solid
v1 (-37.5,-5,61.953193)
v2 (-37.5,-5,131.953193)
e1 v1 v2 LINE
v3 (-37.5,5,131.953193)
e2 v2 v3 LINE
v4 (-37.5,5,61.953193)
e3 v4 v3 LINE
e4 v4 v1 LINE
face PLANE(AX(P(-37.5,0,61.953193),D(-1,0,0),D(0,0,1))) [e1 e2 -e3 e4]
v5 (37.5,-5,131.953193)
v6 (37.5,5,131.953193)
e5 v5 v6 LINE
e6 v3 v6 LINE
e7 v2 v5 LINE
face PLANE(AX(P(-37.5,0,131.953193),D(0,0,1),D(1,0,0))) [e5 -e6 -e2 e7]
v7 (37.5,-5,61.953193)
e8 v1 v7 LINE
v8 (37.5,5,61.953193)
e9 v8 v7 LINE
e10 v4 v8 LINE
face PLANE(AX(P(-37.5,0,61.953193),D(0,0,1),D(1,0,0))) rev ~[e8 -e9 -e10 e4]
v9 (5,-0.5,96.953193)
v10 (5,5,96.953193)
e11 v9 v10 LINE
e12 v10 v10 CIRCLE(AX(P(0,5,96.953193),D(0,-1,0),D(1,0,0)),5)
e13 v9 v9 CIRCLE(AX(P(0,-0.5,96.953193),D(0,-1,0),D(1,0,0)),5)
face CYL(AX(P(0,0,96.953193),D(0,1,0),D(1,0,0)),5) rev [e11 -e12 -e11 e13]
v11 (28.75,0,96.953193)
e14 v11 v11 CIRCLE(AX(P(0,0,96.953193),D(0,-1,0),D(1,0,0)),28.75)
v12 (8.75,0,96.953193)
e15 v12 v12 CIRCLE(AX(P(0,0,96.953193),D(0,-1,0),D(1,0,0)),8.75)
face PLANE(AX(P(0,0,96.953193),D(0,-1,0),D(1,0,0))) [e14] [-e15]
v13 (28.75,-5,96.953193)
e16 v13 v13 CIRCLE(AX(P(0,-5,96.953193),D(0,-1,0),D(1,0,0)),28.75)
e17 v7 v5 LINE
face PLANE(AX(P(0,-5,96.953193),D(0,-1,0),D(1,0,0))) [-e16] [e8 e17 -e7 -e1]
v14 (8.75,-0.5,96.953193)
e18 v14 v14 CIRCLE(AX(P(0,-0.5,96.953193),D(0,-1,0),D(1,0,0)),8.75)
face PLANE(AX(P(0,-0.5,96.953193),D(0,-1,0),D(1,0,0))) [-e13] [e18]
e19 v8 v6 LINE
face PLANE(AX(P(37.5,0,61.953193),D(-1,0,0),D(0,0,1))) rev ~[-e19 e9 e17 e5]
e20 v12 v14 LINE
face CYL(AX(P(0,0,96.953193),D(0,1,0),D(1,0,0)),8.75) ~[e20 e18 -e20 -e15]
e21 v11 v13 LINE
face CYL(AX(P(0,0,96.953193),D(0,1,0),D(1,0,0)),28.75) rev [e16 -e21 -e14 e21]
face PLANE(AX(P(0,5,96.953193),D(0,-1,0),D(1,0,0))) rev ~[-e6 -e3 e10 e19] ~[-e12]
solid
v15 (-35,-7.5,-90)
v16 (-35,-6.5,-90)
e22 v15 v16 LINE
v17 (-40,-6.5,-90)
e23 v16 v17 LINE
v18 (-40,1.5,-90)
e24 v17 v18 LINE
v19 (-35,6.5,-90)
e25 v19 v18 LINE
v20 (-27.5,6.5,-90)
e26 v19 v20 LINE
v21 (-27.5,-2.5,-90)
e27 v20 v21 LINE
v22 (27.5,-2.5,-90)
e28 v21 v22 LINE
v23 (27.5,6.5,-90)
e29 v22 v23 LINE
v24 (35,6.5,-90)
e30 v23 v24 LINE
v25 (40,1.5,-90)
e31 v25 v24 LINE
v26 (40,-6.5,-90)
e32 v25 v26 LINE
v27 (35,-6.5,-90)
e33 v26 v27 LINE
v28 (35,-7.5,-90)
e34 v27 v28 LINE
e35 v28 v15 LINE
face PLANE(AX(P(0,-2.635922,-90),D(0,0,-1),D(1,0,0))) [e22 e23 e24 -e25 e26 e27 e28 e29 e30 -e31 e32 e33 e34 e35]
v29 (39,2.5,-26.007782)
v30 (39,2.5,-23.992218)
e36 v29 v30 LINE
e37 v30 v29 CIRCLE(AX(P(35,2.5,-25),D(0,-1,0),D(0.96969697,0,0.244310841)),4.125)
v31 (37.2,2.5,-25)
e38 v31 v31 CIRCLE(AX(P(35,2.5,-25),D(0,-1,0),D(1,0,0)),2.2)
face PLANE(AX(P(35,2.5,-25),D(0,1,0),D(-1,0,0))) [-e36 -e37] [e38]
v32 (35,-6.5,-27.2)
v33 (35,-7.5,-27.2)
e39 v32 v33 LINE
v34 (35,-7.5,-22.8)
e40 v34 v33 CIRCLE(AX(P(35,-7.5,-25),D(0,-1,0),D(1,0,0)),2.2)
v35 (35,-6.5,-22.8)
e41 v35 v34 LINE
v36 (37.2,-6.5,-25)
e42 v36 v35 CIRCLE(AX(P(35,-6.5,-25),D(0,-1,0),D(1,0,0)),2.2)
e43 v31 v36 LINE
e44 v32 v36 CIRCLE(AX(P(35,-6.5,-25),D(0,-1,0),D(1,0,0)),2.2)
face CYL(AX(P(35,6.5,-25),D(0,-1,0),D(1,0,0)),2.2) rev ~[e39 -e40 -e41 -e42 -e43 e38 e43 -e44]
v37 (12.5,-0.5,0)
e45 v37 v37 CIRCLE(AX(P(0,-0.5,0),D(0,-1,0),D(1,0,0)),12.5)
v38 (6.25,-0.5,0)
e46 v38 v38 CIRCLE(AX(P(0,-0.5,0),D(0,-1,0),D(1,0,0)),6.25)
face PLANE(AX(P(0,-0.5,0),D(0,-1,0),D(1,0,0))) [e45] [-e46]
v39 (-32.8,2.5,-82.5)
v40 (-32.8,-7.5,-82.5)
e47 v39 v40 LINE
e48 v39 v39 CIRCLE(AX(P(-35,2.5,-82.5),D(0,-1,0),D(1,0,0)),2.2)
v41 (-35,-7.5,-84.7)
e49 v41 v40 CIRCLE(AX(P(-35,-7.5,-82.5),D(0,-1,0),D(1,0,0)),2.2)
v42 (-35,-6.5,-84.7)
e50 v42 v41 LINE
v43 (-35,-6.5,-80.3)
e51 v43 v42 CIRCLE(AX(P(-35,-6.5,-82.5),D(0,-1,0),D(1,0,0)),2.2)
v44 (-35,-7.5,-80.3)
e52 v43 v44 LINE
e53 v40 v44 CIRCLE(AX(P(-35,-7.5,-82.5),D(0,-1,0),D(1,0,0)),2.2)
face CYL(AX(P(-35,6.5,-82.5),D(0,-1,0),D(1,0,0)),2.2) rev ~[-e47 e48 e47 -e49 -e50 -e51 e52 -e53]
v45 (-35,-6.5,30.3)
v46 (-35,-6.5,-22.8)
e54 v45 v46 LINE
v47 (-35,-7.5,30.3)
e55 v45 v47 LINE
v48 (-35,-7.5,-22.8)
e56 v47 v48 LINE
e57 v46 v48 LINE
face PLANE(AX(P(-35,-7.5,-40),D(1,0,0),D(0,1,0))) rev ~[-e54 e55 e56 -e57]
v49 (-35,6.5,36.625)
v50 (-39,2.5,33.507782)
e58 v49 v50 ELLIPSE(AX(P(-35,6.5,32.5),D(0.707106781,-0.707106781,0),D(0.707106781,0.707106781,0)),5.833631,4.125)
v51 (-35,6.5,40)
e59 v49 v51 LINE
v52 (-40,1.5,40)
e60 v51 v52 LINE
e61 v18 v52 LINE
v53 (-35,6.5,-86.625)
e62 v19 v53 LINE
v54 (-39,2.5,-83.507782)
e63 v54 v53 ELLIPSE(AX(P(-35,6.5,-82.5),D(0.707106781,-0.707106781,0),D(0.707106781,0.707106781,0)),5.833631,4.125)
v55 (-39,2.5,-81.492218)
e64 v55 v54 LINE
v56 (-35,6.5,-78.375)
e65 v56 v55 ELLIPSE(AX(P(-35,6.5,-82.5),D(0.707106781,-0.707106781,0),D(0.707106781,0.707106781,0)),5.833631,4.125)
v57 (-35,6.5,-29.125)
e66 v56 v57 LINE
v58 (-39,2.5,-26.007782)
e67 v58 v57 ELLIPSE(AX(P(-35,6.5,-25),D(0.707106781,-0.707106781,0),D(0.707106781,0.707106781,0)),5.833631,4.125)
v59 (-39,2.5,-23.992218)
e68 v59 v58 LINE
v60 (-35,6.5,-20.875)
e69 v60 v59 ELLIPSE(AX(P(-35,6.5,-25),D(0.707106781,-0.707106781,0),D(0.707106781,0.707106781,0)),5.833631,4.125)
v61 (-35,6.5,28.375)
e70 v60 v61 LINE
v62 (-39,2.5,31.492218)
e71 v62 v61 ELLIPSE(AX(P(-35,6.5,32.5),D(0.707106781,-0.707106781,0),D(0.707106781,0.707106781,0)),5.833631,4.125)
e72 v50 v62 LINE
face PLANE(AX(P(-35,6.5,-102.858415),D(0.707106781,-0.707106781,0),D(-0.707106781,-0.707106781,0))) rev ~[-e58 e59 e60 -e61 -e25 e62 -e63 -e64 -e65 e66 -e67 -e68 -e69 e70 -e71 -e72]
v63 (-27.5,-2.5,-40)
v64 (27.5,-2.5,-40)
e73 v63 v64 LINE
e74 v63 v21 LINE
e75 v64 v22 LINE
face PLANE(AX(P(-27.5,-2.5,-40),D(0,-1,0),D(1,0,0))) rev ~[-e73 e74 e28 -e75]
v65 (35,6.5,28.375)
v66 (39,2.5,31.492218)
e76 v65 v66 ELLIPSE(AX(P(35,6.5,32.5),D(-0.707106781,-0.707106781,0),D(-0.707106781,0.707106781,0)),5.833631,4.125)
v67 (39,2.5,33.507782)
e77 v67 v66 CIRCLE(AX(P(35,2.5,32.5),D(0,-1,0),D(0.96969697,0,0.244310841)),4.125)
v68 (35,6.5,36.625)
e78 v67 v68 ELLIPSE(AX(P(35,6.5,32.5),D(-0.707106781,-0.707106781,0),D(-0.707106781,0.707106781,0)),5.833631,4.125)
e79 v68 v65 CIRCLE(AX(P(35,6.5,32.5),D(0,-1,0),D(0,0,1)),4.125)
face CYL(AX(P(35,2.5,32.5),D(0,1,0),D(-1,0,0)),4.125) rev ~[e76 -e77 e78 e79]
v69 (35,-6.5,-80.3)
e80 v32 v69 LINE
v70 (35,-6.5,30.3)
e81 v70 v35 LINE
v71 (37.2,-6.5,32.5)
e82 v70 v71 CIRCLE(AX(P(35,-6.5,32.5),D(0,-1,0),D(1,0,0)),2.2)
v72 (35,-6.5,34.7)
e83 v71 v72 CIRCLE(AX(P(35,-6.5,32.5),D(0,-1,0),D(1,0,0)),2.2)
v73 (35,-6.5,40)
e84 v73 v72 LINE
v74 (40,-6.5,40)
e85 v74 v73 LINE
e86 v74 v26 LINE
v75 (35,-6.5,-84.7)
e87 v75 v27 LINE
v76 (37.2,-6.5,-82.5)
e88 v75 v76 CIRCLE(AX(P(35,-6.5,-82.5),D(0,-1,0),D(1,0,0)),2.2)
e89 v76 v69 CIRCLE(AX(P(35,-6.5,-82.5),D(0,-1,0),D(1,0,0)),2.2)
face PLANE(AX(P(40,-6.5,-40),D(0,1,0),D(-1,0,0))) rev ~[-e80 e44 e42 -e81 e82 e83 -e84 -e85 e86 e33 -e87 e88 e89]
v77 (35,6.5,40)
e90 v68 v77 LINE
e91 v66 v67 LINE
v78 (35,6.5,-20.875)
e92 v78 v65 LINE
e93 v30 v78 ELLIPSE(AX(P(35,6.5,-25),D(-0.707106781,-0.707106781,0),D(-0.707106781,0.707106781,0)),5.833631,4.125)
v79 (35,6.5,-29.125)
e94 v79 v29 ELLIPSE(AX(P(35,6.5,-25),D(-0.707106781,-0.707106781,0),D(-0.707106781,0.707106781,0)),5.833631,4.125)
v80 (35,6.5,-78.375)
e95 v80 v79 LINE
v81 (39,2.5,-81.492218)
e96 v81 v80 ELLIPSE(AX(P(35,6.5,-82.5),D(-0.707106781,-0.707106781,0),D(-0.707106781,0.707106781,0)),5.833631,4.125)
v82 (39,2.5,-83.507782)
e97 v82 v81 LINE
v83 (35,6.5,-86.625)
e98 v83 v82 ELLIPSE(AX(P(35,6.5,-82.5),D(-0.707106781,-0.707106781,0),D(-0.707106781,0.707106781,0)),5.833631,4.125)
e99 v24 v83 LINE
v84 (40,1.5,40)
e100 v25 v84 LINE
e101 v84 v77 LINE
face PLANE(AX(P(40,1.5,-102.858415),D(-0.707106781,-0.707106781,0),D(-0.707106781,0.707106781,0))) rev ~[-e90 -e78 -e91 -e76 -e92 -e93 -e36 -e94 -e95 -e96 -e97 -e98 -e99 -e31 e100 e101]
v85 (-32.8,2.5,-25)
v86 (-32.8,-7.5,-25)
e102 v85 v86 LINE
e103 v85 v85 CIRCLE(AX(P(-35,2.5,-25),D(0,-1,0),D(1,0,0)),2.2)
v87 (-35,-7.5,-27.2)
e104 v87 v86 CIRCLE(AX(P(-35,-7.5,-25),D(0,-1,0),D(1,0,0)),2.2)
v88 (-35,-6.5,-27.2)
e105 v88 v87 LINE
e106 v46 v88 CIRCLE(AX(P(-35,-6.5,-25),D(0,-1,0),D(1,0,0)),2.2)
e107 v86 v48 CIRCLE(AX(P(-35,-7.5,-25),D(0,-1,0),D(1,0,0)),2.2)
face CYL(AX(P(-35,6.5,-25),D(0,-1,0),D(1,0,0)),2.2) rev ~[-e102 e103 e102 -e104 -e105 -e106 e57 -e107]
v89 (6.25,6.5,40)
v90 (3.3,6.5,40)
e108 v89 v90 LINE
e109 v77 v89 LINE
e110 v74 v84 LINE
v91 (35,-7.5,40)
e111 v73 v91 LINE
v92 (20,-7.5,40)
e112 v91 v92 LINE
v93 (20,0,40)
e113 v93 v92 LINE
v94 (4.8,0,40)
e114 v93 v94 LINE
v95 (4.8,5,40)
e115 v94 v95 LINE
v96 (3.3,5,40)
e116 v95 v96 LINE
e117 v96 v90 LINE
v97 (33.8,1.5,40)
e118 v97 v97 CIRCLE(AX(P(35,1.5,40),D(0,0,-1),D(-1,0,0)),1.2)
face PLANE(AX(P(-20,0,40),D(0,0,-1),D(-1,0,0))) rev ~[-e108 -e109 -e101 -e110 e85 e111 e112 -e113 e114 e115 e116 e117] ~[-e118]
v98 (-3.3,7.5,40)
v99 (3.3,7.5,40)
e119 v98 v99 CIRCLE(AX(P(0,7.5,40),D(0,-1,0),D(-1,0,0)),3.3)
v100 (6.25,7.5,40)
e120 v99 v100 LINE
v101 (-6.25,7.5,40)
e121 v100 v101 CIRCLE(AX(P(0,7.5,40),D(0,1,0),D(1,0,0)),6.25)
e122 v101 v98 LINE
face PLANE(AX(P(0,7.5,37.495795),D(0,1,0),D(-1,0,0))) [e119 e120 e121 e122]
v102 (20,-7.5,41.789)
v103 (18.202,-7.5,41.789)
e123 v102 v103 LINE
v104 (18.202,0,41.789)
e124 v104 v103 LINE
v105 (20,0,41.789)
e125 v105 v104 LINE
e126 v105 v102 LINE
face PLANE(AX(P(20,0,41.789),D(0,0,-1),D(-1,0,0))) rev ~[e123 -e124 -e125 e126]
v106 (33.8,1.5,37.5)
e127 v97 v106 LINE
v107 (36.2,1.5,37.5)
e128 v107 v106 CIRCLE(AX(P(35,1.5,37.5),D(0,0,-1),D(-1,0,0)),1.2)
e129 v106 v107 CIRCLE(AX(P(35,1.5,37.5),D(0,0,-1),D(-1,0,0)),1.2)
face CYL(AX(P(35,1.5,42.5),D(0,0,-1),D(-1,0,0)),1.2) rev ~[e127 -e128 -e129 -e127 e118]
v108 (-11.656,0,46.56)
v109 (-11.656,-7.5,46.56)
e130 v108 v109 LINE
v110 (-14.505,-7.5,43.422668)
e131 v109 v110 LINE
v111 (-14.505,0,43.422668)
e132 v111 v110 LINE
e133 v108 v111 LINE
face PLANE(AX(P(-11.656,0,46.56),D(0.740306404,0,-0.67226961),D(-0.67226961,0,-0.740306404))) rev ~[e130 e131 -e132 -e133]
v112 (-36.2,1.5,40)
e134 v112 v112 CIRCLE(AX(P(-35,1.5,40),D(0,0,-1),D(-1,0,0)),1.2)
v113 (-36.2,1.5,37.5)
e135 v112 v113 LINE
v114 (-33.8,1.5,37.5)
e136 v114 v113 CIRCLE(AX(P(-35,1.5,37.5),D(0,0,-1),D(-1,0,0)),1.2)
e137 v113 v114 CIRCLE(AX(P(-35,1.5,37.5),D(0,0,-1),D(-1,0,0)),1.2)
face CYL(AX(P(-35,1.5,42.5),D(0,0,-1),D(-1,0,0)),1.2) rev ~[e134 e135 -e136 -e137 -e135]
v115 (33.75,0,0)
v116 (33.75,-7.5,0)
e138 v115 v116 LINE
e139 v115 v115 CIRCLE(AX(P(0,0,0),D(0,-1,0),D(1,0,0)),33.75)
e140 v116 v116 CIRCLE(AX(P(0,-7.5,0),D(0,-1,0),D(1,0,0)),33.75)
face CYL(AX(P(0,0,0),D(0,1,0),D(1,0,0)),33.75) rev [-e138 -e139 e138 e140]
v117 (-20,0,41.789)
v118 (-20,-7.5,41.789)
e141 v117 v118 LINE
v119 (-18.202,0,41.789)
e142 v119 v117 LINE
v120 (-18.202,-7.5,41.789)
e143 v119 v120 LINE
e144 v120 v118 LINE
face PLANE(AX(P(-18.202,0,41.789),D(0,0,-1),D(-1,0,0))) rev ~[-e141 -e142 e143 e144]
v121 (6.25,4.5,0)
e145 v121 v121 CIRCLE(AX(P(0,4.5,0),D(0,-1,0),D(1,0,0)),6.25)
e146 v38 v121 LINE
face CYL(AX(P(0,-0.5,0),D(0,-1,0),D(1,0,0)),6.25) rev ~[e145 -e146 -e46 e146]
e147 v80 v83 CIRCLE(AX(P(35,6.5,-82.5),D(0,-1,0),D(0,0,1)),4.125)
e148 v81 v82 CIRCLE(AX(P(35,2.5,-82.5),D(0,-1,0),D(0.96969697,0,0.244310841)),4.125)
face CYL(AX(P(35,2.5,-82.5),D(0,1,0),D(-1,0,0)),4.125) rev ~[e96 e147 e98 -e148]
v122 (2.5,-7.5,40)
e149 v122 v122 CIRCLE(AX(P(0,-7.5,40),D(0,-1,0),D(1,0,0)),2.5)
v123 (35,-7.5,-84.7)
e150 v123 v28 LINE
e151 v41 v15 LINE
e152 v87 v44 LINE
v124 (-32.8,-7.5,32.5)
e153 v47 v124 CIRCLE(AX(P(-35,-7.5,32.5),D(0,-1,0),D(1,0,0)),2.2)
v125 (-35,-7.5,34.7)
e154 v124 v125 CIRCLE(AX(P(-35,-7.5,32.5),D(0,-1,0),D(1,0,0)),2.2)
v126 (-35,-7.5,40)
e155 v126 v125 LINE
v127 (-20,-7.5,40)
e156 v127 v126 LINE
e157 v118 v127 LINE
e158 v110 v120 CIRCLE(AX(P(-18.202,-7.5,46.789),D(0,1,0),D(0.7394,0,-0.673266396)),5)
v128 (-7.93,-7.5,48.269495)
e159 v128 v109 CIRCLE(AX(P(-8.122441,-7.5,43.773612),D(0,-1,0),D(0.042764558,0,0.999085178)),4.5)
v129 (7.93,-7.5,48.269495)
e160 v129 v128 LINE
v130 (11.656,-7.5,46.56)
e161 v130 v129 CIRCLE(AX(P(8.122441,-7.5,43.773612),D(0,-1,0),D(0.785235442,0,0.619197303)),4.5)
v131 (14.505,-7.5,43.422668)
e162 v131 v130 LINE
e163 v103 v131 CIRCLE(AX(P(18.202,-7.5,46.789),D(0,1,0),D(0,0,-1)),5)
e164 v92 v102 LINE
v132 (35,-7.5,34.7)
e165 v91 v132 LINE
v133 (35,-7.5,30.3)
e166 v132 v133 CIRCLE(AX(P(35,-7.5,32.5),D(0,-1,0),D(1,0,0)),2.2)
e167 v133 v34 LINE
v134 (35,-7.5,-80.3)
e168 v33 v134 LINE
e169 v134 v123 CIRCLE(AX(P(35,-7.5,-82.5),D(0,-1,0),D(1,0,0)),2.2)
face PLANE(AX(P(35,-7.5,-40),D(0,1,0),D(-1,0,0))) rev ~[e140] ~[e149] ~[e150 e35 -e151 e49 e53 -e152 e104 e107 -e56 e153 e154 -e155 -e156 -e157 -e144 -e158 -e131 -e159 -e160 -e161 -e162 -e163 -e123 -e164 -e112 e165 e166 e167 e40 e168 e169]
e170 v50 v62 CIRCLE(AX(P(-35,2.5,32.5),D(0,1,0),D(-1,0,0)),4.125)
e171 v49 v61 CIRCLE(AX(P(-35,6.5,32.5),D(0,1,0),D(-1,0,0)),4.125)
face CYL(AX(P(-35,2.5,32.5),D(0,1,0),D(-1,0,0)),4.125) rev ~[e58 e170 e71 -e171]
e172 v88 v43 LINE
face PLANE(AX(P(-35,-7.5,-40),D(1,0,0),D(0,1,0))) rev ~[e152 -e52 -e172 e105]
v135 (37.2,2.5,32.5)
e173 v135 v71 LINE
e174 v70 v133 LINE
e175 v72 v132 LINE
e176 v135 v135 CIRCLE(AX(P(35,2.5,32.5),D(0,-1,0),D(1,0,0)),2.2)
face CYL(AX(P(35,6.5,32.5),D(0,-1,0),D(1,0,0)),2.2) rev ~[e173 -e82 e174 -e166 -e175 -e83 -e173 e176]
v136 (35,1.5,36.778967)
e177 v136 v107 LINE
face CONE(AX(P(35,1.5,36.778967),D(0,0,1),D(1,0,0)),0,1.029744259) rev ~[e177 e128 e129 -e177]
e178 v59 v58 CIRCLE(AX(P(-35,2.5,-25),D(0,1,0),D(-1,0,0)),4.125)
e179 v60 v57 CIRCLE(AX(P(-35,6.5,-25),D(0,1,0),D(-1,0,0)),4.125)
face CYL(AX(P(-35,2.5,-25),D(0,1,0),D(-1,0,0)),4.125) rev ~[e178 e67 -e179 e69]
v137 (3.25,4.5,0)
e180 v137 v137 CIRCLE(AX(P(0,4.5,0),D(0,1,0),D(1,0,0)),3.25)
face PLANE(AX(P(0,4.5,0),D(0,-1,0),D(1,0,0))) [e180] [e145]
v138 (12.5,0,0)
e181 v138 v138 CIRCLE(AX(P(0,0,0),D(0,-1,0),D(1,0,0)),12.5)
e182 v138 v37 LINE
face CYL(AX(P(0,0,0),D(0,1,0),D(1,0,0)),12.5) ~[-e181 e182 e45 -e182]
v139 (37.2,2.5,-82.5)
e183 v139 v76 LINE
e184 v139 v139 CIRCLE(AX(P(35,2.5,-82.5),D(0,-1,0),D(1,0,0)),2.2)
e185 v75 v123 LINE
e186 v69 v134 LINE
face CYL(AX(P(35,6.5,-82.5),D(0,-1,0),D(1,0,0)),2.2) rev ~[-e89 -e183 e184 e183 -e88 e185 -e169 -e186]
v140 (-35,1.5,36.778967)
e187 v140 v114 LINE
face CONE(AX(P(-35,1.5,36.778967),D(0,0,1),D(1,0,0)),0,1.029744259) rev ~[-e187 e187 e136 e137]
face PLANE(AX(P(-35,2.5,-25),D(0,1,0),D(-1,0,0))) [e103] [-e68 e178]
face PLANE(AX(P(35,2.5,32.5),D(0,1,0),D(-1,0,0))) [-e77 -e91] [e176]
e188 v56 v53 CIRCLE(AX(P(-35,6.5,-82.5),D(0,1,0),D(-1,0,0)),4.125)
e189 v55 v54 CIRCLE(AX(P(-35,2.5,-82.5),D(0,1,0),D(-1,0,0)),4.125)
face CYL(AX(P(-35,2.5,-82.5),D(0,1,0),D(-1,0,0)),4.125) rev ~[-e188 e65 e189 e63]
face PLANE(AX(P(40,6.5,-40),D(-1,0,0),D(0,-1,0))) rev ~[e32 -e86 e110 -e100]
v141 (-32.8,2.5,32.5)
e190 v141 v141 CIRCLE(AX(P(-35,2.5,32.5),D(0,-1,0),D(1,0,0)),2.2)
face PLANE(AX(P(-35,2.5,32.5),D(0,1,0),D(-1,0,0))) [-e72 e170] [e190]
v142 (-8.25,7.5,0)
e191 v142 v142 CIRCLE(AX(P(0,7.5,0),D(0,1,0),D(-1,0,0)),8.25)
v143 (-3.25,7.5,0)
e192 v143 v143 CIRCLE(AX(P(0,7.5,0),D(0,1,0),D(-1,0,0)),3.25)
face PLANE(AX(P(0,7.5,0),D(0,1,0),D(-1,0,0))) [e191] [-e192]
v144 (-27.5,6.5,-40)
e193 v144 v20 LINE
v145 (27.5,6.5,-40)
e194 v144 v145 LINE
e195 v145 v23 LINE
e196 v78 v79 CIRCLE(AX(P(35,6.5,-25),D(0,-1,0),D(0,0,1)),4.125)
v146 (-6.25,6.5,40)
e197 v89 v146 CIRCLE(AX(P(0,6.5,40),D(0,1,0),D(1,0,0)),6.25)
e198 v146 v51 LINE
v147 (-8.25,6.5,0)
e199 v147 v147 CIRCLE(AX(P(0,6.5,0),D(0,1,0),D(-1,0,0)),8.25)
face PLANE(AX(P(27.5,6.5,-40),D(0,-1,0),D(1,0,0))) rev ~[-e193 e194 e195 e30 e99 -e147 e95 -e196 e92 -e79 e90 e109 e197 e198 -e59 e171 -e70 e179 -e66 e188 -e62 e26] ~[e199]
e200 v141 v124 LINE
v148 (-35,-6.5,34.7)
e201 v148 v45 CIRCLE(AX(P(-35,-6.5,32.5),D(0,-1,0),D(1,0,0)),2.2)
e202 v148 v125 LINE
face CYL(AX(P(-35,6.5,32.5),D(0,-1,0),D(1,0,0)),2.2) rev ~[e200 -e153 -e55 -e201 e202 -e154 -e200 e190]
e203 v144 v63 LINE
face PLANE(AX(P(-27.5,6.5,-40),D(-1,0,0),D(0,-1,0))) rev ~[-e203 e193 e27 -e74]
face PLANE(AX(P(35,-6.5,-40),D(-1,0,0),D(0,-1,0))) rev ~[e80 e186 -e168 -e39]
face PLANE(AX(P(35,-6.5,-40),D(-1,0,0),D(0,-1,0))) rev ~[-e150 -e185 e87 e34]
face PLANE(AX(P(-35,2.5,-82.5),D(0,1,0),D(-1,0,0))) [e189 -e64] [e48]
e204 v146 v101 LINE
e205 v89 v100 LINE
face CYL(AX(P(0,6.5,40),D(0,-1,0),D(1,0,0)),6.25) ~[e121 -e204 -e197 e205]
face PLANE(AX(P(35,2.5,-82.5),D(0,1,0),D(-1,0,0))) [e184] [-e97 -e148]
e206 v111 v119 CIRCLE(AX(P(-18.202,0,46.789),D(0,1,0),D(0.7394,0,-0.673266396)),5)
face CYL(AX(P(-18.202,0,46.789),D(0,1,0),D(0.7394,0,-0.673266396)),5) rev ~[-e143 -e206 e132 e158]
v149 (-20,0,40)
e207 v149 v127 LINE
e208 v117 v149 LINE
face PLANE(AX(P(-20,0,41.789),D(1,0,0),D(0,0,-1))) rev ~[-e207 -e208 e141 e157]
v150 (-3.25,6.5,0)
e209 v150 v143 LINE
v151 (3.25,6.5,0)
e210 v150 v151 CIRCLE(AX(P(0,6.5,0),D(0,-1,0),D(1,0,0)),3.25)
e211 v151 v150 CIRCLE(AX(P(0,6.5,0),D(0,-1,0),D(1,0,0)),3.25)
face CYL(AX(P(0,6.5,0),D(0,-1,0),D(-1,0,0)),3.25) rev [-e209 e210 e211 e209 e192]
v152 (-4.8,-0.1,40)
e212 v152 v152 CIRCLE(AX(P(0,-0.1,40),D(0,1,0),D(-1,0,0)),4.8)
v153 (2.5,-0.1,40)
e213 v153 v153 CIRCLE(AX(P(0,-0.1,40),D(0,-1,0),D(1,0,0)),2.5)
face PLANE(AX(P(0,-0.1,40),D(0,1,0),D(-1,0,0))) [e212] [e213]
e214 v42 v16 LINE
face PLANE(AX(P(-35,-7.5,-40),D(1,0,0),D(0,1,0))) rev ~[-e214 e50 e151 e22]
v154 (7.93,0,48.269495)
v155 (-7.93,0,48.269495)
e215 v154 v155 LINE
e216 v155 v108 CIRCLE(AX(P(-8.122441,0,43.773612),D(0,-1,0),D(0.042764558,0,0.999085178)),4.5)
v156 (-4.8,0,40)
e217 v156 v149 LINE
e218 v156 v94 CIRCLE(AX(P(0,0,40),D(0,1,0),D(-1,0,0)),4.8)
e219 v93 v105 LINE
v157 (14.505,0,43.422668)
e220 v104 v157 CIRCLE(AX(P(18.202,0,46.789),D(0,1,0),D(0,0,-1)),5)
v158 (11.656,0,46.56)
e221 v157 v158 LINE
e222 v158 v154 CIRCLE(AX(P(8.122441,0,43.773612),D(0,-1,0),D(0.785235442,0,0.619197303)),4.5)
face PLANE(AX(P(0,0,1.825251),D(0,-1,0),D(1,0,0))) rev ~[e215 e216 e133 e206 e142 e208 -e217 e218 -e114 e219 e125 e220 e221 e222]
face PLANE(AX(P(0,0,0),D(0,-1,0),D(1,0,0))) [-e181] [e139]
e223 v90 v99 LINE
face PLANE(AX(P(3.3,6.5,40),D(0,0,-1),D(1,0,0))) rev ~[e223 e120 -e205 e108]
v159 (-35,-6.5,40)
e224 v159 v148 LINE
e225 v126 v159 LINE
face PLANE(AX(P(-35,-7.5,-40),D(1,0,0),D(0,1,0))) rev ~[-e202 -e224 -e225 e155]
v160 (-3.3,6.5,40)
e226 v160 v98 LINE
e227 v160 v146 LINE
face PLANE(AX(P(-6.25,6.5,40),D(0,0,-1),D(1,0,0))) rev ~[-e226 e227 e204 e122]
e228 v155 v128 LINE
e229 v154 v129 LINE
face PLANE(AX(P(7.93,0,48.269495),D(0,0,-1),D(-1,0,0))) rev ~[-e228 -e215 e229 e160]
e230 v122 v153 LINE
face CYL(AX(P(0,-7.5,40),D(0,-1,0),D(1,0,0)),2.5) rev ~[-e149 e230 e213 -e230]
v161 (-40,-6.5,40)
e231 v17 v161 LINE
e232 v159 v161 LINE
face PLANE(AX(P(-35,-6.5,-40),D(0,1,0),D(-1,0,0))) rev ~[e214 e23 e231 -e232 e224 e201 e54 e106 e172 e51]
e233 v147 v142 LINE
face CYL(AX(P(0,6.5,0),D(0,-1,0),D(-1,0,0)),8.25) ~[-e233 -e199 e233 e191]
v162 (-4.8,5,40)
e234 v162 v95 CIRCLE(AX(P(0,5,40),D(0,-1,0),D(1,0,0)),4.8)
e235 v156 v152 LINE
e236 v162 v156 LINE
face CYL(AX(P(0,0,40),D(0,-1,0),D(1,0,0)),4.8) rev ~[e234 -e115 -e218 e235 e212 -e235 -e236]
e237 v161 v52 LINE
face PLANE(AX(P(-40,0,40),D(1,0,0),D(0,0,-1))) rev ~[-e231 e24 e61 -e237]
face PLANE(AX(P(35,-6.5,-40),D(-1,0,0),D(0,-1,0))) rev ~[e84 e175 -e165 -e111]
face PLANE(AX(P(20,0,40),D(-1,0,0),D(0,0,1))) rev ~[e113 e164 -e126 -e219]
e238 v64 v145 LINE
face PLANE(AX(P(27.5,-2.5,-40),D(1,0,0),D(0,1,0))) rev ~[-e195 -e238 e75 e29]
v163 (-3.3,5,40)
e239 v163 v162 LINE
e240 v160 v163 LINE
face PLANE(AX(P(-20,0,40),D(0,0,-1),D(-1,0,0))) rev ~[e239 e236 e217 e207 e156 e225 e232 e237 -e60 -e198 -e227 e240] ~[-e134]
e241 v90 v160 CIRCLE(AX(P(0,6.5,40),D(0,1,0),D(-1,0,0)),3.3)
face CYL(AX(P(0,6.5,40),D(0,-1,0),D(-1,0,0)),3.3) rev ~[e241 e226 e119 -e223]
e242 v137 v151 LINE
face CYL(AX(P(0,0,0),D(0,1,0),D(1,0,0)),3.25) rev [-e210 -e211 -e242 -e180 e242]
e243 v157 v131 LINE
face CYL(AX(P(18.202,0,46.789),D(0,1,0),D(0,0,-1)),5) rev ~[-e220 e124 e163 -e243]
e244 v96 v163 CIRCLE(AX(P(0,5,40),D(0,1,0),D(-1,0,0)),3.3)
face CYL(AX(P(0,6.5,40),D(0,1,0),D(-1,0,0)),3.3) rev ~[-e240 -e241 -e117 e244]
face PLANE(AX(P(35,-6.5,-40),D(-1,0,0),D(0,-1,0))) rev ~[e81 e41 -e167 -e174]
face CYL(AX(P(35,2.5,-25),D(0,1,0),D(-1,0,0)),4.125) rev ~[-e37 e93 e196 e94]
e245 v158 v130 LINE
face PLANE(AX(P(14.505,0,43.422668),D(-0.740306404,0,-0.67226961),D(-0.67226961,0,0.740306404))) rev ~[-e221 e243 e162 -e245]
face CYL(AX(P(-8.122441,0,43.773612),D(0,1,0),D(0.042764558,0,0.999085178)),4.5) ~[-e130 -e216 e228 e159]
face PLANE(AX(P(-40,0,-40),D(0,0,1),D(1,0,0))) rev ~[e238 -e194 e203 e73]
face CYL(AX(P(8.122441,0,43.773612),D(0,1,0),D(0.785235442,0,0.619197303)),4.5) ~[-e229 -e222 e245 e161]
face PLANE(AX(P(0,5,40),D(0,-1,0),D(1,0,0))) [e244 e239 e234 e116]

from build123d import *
from build123d import SkipClean  # not in build123d's __all__

# Parameters (mm, degrees)
F0_R            = 3.25
F1_DEPTH        = 6.5
F2_R            = 33.75
F3_DEPTH        = 7.5
F4_R            = 12.5
F4_R_2          = 3.25
F5_DEPTH        = 0.5
F6_R            = 8.25
F6_R_2          = 3.25
F7_DEPTH        = 1
F9_DEPTH        = 50
F10_DEPTH       = 120
F12_D           = 4.4
F12_CBORE_D     = 8.25
F12_CBORE_DEPTH = 4
F13_T1_DEPTH    = 155.7168298797
F14_R           = 2.5
F15_DEPTH       = 15.001
F16_R           = 4.8
F17_DEPTH       = 5
F18_R           = 3.3
F19_DEPTH       = 2.5
F20_R           = 4.8
F21_DEPTH       = 0.1
F23_DEPTH       = 1
F24_R           = 6.25
F25_DEPTH       = 5
F27_D           = 2.4
F27_DEPTH       = 2.5
F27_TIP         = 0.7210327428
F28_W           = 75
F28_H           = 70
F28_R           = 5
F29_DEPTH       = 5
F30_W           = 75
F30_H           = 70
F30_R           = 28.75
F31_DEPTH       = 5
F32_R           = 8.75
F32_R_2         = 5
F33_DEPTH       = 0.5


# Not quite as in the source:
# - a fillet or chamfer that OpenCascade refuses, or shapes differently, is made with other operations: its cross-section is extruded or revolved along the edge and cut away or added
# - after a boolean that leaves OpenCascade's solid faulty, fix() repairs it
# - a feature names something its author has since deleted; it is built from what else it names


with BuildPart() as f1:
    # F0 (on Front) → F1 (new body)
    with BuildSketch(Plane.XZ):
        Polygon((40, -40), (40, -23.2305045641), (40, 0.7694954359), (40, 40), (19.3889045436, 40), (-20.6110954564, 40), (-40, 40), (-40, 0.7694954359), (-40, -23.2305045641), (-40, -40), align=None)
        Circle(F0_R, mode=Mode.SUBTRACT)
    extrude(amount=-F1_DEPTH)

    # F2 (on Front) → F3 (join)
    with BuildSketch(Plane.XZ):
        with BuildLine():
            Line((-40, 40), (-40, -40))
            Line((-40, -40), (40, -40))
            Line((40, -40), (40, 40))
            Line((40, 40), (20, 40))
            Line((20, 40), (20, 41.789))
            Line((20, 41.789), (18.202, 41.789))
            ThreePointArc((18.202, 41.789), (16.1810670348, 42.2156172312), (14.505, 43.4226680199))
            Line((14.505, 43.4226680199), (11.656, 46.56))
            ThreePointArc((11.656, 46.56), (9.9989699318, 47.8636778232), (7.93, 48.2694954359))
            Line((7.93, 48.2694954359), (-7.93, 48.2694954359))
            ThreePointArc((-7.93, 48.2694954359), (-9.9989699318, 47.8636778232), (-11.656, 46.56))
            Line((-11.656, 46.56), (-14.505, 43.4226680199))
            ThreePointArc((-14.505, 43.4226680199), (-16.1810670348, 42.2156172312), (-18.202, 41.789))
            Line((-18.202, 41.789), (-20, 41.789))
            Line((-20, 41.789), (-20, 40))
            Line((-20, 40), (-40, 40))
        make_face()
        Circle(F2_R, mode=Mode.SUBTRACT)
    extrude(amount=F3_DEPTH)

    # F4 (on face) → F5 (join)
    with BuildSketch(Plane.XZ):
        Circle(F4_R)
        Circle(F4_R_2, mode=Mode.SUBTRACT)
    extrude(amount=F5_DEPTH)

    # F6 (on face) → F7 (join)
    with BuildSketch(Plane(origin=(0, 6.5, 0), x_dir=(-1, 0, 0), z_dir=(0, 1, 0))):
        Circle(F6_R)
        Circle(F6_R_2, mode=Mode.SUBTRACT)
    with SkipClean():  # cleaning this boolean's faces spoils the solid; the shape is the same uncleaned
        extrude(amount=F7_DEPTH)

    # F8 (on face) → F9 (join)
    with BuildSketch(Plane(origin=(0, 0, -40), x_dir=(1, 0, 0), z_dir=(0, 0, -1))):
        Polygon((27.5, -6.5), (40, -6.5), (40, 6.5), (35, 6.5), (35, 7.5), (-35, 7.5), (-35, 6.5), (-40, 6.5), (-40, -6.5), (-27.5, -6.5), (-27.5, 2.5), (27.5, 2.5), align=None)
    extrude(amount=F9_DEPTH)

    add(f1.part.fix(), mode=Mode.REPLACE)

    # F10 (cut): faces of the model
    f10_faces = [f1.faces().sort_by_distance(p)[0] for p in [
        (37.5, -7, -40),
        (-37.5, -7, -40),
    ]]
    extrude(f10_faces, amount=-F10_DEPTH, mode=Mode.SUBTRACT)

    # F12 (through all)
    with Locations(Plane(origin=(0, 6.5, 0), x_dir=(-1, 0, 0), z_dir=(0, 1, 0))):
        with Locations((35, 32.5), (35, -25), (35, -82.5), (-35, -82.5), (-35, -25), (-35, 32.5)):
            CounterBoreHole(F12_D / 2, F12_CBORE_D / 2, F12_CBORE_DEPTH)

    # F13: chamfer of 5 on 2 edges, made by hand

    # F13_s2 → F13_t1 (cut)
    with BuildSketch(Plane.XY.offset(-102.8584149398)):
        Polygon((40, 1.5), (35, 6.5), (40, 6.5), align=None)
        Polygon((-35, 6.5), (-40, 1.5), (-40, 6.5), align=None)
    extrude(amount=F13_T1_DEPTH, mode=Mode.SUBTRACT)

    # F14 (on face) → F15 (cut, through all)
    with BuildSketch(Plane.XZ.offset(7.5)):
        with Locations((0, 40)):
            Circle(F14_R)
    extrude(amount=-F15_DEPTH, mode=Mode.SUBTRACT)

    # F16 (on Front) → F17 (cut)
    with BuildSketch(Plane.XZ):
        with Locations((0, 40)):
            Circle(F16_R)
    extrude(amount=-F17_DEPTH, mode=Mode.SUBTRACT)

    # F18 (on face) → F19 (cut)
    with BuildSketch(Plane(origin=(0, 6.5, 0), x_dir=(-1, 0, 0), z_dir=(0, 1, 0))):
        with Locations((0, 40)):
            Circle(F18_R)
    extrude(amount=-F19_DEPTH, mode=Mode.SUBTRACT)

    # F20 (on face) → F21 (cut)
    with BuildSketch(Plane(origin=(0, 0, 0), x_dir=(-1, 0, 0), z_dir=(0, 1, 0))):
        with Locations((0, 40)):
            Circle(F20_R)
    extrude(amount=-F21_DEPTH, mode=Mode.SUBTRACT)

    # F22 (on face) → F23 (join)
    with BuildSketch(Plane(origin=(0, 6.5, 0), x_dir=(-1, 0, 0), z_dir=(0, 1, 0))):
        with BuildLine():
            ThreePointArc((3.3, 40), (0, 36.7), (-3.3, 40))
            Line((-3.3, 40), (-6.25, 40))
            ThreePointArc((-6.25, 40), (0, 33.75), (6.25, 40))
            Line((6.25, 40), (3.3, 40))
        make_face()
    extrude(amount=F23_DEPTH)

    # F24 (on face) → F25 (cut)
    with BuildSketch(Plane.XZ.offset(0.5)):
        Circle(F24_R)
    extrude(amount=-F25_DEPTH, mode=Mode.SUBTRACT)

    # F27
    with Locations(Plane.XY.offset(40)):
        with Locations((-35, 1.5), (35, 1.5)):
            Hole(F27_D / 2, depth=F27_DEPTH)
            with Locations((0, 0, -(F27_DEPTH + F27_TIP / 2))):  # 118° drill point
                Cone(0, F27_D / 2, F27_TIP, mode=Mode.SUBTRACT)


with BuildPart() as f29:
    # F28 (on Front) → F29 (new body)
    with BuildSketch(Plane.XZ):
        with Locations((0, 96.9531931057)):
            Rectangle(F28_W, F28_H)
        with Locations((0, 96.9531931057)):
            Circle(F28_R, mode=Mode.SUBTRACT)
    extrude(amount=-F29_DEPTH)

    # F30 (on face) → F31 (join)
    with BuildSketch(Plane.XZ):
        with Locations((0, 96.9531931057)):
            Rectangle(F30_W, F30_H)
        with Locations((0, 96.9531931057)):
            Circle(F30_R, mode=Mode.SUBTRACT)
    extrude(amount=F31_DEPTH)

    # F32 (on face) → F33 (join)
    with BuildSketch(Plane.XZ):
        with Locations((0, 96.9531931057)):
            Circle(F32_R)
        with Locations((0, 96.9531931057)):
            Circle(F32_R_2, mode=Mode.SUBTRACT)
    extrude(amount=F33_DEPTH)


solid = Compound([f1.part, f29.part])
